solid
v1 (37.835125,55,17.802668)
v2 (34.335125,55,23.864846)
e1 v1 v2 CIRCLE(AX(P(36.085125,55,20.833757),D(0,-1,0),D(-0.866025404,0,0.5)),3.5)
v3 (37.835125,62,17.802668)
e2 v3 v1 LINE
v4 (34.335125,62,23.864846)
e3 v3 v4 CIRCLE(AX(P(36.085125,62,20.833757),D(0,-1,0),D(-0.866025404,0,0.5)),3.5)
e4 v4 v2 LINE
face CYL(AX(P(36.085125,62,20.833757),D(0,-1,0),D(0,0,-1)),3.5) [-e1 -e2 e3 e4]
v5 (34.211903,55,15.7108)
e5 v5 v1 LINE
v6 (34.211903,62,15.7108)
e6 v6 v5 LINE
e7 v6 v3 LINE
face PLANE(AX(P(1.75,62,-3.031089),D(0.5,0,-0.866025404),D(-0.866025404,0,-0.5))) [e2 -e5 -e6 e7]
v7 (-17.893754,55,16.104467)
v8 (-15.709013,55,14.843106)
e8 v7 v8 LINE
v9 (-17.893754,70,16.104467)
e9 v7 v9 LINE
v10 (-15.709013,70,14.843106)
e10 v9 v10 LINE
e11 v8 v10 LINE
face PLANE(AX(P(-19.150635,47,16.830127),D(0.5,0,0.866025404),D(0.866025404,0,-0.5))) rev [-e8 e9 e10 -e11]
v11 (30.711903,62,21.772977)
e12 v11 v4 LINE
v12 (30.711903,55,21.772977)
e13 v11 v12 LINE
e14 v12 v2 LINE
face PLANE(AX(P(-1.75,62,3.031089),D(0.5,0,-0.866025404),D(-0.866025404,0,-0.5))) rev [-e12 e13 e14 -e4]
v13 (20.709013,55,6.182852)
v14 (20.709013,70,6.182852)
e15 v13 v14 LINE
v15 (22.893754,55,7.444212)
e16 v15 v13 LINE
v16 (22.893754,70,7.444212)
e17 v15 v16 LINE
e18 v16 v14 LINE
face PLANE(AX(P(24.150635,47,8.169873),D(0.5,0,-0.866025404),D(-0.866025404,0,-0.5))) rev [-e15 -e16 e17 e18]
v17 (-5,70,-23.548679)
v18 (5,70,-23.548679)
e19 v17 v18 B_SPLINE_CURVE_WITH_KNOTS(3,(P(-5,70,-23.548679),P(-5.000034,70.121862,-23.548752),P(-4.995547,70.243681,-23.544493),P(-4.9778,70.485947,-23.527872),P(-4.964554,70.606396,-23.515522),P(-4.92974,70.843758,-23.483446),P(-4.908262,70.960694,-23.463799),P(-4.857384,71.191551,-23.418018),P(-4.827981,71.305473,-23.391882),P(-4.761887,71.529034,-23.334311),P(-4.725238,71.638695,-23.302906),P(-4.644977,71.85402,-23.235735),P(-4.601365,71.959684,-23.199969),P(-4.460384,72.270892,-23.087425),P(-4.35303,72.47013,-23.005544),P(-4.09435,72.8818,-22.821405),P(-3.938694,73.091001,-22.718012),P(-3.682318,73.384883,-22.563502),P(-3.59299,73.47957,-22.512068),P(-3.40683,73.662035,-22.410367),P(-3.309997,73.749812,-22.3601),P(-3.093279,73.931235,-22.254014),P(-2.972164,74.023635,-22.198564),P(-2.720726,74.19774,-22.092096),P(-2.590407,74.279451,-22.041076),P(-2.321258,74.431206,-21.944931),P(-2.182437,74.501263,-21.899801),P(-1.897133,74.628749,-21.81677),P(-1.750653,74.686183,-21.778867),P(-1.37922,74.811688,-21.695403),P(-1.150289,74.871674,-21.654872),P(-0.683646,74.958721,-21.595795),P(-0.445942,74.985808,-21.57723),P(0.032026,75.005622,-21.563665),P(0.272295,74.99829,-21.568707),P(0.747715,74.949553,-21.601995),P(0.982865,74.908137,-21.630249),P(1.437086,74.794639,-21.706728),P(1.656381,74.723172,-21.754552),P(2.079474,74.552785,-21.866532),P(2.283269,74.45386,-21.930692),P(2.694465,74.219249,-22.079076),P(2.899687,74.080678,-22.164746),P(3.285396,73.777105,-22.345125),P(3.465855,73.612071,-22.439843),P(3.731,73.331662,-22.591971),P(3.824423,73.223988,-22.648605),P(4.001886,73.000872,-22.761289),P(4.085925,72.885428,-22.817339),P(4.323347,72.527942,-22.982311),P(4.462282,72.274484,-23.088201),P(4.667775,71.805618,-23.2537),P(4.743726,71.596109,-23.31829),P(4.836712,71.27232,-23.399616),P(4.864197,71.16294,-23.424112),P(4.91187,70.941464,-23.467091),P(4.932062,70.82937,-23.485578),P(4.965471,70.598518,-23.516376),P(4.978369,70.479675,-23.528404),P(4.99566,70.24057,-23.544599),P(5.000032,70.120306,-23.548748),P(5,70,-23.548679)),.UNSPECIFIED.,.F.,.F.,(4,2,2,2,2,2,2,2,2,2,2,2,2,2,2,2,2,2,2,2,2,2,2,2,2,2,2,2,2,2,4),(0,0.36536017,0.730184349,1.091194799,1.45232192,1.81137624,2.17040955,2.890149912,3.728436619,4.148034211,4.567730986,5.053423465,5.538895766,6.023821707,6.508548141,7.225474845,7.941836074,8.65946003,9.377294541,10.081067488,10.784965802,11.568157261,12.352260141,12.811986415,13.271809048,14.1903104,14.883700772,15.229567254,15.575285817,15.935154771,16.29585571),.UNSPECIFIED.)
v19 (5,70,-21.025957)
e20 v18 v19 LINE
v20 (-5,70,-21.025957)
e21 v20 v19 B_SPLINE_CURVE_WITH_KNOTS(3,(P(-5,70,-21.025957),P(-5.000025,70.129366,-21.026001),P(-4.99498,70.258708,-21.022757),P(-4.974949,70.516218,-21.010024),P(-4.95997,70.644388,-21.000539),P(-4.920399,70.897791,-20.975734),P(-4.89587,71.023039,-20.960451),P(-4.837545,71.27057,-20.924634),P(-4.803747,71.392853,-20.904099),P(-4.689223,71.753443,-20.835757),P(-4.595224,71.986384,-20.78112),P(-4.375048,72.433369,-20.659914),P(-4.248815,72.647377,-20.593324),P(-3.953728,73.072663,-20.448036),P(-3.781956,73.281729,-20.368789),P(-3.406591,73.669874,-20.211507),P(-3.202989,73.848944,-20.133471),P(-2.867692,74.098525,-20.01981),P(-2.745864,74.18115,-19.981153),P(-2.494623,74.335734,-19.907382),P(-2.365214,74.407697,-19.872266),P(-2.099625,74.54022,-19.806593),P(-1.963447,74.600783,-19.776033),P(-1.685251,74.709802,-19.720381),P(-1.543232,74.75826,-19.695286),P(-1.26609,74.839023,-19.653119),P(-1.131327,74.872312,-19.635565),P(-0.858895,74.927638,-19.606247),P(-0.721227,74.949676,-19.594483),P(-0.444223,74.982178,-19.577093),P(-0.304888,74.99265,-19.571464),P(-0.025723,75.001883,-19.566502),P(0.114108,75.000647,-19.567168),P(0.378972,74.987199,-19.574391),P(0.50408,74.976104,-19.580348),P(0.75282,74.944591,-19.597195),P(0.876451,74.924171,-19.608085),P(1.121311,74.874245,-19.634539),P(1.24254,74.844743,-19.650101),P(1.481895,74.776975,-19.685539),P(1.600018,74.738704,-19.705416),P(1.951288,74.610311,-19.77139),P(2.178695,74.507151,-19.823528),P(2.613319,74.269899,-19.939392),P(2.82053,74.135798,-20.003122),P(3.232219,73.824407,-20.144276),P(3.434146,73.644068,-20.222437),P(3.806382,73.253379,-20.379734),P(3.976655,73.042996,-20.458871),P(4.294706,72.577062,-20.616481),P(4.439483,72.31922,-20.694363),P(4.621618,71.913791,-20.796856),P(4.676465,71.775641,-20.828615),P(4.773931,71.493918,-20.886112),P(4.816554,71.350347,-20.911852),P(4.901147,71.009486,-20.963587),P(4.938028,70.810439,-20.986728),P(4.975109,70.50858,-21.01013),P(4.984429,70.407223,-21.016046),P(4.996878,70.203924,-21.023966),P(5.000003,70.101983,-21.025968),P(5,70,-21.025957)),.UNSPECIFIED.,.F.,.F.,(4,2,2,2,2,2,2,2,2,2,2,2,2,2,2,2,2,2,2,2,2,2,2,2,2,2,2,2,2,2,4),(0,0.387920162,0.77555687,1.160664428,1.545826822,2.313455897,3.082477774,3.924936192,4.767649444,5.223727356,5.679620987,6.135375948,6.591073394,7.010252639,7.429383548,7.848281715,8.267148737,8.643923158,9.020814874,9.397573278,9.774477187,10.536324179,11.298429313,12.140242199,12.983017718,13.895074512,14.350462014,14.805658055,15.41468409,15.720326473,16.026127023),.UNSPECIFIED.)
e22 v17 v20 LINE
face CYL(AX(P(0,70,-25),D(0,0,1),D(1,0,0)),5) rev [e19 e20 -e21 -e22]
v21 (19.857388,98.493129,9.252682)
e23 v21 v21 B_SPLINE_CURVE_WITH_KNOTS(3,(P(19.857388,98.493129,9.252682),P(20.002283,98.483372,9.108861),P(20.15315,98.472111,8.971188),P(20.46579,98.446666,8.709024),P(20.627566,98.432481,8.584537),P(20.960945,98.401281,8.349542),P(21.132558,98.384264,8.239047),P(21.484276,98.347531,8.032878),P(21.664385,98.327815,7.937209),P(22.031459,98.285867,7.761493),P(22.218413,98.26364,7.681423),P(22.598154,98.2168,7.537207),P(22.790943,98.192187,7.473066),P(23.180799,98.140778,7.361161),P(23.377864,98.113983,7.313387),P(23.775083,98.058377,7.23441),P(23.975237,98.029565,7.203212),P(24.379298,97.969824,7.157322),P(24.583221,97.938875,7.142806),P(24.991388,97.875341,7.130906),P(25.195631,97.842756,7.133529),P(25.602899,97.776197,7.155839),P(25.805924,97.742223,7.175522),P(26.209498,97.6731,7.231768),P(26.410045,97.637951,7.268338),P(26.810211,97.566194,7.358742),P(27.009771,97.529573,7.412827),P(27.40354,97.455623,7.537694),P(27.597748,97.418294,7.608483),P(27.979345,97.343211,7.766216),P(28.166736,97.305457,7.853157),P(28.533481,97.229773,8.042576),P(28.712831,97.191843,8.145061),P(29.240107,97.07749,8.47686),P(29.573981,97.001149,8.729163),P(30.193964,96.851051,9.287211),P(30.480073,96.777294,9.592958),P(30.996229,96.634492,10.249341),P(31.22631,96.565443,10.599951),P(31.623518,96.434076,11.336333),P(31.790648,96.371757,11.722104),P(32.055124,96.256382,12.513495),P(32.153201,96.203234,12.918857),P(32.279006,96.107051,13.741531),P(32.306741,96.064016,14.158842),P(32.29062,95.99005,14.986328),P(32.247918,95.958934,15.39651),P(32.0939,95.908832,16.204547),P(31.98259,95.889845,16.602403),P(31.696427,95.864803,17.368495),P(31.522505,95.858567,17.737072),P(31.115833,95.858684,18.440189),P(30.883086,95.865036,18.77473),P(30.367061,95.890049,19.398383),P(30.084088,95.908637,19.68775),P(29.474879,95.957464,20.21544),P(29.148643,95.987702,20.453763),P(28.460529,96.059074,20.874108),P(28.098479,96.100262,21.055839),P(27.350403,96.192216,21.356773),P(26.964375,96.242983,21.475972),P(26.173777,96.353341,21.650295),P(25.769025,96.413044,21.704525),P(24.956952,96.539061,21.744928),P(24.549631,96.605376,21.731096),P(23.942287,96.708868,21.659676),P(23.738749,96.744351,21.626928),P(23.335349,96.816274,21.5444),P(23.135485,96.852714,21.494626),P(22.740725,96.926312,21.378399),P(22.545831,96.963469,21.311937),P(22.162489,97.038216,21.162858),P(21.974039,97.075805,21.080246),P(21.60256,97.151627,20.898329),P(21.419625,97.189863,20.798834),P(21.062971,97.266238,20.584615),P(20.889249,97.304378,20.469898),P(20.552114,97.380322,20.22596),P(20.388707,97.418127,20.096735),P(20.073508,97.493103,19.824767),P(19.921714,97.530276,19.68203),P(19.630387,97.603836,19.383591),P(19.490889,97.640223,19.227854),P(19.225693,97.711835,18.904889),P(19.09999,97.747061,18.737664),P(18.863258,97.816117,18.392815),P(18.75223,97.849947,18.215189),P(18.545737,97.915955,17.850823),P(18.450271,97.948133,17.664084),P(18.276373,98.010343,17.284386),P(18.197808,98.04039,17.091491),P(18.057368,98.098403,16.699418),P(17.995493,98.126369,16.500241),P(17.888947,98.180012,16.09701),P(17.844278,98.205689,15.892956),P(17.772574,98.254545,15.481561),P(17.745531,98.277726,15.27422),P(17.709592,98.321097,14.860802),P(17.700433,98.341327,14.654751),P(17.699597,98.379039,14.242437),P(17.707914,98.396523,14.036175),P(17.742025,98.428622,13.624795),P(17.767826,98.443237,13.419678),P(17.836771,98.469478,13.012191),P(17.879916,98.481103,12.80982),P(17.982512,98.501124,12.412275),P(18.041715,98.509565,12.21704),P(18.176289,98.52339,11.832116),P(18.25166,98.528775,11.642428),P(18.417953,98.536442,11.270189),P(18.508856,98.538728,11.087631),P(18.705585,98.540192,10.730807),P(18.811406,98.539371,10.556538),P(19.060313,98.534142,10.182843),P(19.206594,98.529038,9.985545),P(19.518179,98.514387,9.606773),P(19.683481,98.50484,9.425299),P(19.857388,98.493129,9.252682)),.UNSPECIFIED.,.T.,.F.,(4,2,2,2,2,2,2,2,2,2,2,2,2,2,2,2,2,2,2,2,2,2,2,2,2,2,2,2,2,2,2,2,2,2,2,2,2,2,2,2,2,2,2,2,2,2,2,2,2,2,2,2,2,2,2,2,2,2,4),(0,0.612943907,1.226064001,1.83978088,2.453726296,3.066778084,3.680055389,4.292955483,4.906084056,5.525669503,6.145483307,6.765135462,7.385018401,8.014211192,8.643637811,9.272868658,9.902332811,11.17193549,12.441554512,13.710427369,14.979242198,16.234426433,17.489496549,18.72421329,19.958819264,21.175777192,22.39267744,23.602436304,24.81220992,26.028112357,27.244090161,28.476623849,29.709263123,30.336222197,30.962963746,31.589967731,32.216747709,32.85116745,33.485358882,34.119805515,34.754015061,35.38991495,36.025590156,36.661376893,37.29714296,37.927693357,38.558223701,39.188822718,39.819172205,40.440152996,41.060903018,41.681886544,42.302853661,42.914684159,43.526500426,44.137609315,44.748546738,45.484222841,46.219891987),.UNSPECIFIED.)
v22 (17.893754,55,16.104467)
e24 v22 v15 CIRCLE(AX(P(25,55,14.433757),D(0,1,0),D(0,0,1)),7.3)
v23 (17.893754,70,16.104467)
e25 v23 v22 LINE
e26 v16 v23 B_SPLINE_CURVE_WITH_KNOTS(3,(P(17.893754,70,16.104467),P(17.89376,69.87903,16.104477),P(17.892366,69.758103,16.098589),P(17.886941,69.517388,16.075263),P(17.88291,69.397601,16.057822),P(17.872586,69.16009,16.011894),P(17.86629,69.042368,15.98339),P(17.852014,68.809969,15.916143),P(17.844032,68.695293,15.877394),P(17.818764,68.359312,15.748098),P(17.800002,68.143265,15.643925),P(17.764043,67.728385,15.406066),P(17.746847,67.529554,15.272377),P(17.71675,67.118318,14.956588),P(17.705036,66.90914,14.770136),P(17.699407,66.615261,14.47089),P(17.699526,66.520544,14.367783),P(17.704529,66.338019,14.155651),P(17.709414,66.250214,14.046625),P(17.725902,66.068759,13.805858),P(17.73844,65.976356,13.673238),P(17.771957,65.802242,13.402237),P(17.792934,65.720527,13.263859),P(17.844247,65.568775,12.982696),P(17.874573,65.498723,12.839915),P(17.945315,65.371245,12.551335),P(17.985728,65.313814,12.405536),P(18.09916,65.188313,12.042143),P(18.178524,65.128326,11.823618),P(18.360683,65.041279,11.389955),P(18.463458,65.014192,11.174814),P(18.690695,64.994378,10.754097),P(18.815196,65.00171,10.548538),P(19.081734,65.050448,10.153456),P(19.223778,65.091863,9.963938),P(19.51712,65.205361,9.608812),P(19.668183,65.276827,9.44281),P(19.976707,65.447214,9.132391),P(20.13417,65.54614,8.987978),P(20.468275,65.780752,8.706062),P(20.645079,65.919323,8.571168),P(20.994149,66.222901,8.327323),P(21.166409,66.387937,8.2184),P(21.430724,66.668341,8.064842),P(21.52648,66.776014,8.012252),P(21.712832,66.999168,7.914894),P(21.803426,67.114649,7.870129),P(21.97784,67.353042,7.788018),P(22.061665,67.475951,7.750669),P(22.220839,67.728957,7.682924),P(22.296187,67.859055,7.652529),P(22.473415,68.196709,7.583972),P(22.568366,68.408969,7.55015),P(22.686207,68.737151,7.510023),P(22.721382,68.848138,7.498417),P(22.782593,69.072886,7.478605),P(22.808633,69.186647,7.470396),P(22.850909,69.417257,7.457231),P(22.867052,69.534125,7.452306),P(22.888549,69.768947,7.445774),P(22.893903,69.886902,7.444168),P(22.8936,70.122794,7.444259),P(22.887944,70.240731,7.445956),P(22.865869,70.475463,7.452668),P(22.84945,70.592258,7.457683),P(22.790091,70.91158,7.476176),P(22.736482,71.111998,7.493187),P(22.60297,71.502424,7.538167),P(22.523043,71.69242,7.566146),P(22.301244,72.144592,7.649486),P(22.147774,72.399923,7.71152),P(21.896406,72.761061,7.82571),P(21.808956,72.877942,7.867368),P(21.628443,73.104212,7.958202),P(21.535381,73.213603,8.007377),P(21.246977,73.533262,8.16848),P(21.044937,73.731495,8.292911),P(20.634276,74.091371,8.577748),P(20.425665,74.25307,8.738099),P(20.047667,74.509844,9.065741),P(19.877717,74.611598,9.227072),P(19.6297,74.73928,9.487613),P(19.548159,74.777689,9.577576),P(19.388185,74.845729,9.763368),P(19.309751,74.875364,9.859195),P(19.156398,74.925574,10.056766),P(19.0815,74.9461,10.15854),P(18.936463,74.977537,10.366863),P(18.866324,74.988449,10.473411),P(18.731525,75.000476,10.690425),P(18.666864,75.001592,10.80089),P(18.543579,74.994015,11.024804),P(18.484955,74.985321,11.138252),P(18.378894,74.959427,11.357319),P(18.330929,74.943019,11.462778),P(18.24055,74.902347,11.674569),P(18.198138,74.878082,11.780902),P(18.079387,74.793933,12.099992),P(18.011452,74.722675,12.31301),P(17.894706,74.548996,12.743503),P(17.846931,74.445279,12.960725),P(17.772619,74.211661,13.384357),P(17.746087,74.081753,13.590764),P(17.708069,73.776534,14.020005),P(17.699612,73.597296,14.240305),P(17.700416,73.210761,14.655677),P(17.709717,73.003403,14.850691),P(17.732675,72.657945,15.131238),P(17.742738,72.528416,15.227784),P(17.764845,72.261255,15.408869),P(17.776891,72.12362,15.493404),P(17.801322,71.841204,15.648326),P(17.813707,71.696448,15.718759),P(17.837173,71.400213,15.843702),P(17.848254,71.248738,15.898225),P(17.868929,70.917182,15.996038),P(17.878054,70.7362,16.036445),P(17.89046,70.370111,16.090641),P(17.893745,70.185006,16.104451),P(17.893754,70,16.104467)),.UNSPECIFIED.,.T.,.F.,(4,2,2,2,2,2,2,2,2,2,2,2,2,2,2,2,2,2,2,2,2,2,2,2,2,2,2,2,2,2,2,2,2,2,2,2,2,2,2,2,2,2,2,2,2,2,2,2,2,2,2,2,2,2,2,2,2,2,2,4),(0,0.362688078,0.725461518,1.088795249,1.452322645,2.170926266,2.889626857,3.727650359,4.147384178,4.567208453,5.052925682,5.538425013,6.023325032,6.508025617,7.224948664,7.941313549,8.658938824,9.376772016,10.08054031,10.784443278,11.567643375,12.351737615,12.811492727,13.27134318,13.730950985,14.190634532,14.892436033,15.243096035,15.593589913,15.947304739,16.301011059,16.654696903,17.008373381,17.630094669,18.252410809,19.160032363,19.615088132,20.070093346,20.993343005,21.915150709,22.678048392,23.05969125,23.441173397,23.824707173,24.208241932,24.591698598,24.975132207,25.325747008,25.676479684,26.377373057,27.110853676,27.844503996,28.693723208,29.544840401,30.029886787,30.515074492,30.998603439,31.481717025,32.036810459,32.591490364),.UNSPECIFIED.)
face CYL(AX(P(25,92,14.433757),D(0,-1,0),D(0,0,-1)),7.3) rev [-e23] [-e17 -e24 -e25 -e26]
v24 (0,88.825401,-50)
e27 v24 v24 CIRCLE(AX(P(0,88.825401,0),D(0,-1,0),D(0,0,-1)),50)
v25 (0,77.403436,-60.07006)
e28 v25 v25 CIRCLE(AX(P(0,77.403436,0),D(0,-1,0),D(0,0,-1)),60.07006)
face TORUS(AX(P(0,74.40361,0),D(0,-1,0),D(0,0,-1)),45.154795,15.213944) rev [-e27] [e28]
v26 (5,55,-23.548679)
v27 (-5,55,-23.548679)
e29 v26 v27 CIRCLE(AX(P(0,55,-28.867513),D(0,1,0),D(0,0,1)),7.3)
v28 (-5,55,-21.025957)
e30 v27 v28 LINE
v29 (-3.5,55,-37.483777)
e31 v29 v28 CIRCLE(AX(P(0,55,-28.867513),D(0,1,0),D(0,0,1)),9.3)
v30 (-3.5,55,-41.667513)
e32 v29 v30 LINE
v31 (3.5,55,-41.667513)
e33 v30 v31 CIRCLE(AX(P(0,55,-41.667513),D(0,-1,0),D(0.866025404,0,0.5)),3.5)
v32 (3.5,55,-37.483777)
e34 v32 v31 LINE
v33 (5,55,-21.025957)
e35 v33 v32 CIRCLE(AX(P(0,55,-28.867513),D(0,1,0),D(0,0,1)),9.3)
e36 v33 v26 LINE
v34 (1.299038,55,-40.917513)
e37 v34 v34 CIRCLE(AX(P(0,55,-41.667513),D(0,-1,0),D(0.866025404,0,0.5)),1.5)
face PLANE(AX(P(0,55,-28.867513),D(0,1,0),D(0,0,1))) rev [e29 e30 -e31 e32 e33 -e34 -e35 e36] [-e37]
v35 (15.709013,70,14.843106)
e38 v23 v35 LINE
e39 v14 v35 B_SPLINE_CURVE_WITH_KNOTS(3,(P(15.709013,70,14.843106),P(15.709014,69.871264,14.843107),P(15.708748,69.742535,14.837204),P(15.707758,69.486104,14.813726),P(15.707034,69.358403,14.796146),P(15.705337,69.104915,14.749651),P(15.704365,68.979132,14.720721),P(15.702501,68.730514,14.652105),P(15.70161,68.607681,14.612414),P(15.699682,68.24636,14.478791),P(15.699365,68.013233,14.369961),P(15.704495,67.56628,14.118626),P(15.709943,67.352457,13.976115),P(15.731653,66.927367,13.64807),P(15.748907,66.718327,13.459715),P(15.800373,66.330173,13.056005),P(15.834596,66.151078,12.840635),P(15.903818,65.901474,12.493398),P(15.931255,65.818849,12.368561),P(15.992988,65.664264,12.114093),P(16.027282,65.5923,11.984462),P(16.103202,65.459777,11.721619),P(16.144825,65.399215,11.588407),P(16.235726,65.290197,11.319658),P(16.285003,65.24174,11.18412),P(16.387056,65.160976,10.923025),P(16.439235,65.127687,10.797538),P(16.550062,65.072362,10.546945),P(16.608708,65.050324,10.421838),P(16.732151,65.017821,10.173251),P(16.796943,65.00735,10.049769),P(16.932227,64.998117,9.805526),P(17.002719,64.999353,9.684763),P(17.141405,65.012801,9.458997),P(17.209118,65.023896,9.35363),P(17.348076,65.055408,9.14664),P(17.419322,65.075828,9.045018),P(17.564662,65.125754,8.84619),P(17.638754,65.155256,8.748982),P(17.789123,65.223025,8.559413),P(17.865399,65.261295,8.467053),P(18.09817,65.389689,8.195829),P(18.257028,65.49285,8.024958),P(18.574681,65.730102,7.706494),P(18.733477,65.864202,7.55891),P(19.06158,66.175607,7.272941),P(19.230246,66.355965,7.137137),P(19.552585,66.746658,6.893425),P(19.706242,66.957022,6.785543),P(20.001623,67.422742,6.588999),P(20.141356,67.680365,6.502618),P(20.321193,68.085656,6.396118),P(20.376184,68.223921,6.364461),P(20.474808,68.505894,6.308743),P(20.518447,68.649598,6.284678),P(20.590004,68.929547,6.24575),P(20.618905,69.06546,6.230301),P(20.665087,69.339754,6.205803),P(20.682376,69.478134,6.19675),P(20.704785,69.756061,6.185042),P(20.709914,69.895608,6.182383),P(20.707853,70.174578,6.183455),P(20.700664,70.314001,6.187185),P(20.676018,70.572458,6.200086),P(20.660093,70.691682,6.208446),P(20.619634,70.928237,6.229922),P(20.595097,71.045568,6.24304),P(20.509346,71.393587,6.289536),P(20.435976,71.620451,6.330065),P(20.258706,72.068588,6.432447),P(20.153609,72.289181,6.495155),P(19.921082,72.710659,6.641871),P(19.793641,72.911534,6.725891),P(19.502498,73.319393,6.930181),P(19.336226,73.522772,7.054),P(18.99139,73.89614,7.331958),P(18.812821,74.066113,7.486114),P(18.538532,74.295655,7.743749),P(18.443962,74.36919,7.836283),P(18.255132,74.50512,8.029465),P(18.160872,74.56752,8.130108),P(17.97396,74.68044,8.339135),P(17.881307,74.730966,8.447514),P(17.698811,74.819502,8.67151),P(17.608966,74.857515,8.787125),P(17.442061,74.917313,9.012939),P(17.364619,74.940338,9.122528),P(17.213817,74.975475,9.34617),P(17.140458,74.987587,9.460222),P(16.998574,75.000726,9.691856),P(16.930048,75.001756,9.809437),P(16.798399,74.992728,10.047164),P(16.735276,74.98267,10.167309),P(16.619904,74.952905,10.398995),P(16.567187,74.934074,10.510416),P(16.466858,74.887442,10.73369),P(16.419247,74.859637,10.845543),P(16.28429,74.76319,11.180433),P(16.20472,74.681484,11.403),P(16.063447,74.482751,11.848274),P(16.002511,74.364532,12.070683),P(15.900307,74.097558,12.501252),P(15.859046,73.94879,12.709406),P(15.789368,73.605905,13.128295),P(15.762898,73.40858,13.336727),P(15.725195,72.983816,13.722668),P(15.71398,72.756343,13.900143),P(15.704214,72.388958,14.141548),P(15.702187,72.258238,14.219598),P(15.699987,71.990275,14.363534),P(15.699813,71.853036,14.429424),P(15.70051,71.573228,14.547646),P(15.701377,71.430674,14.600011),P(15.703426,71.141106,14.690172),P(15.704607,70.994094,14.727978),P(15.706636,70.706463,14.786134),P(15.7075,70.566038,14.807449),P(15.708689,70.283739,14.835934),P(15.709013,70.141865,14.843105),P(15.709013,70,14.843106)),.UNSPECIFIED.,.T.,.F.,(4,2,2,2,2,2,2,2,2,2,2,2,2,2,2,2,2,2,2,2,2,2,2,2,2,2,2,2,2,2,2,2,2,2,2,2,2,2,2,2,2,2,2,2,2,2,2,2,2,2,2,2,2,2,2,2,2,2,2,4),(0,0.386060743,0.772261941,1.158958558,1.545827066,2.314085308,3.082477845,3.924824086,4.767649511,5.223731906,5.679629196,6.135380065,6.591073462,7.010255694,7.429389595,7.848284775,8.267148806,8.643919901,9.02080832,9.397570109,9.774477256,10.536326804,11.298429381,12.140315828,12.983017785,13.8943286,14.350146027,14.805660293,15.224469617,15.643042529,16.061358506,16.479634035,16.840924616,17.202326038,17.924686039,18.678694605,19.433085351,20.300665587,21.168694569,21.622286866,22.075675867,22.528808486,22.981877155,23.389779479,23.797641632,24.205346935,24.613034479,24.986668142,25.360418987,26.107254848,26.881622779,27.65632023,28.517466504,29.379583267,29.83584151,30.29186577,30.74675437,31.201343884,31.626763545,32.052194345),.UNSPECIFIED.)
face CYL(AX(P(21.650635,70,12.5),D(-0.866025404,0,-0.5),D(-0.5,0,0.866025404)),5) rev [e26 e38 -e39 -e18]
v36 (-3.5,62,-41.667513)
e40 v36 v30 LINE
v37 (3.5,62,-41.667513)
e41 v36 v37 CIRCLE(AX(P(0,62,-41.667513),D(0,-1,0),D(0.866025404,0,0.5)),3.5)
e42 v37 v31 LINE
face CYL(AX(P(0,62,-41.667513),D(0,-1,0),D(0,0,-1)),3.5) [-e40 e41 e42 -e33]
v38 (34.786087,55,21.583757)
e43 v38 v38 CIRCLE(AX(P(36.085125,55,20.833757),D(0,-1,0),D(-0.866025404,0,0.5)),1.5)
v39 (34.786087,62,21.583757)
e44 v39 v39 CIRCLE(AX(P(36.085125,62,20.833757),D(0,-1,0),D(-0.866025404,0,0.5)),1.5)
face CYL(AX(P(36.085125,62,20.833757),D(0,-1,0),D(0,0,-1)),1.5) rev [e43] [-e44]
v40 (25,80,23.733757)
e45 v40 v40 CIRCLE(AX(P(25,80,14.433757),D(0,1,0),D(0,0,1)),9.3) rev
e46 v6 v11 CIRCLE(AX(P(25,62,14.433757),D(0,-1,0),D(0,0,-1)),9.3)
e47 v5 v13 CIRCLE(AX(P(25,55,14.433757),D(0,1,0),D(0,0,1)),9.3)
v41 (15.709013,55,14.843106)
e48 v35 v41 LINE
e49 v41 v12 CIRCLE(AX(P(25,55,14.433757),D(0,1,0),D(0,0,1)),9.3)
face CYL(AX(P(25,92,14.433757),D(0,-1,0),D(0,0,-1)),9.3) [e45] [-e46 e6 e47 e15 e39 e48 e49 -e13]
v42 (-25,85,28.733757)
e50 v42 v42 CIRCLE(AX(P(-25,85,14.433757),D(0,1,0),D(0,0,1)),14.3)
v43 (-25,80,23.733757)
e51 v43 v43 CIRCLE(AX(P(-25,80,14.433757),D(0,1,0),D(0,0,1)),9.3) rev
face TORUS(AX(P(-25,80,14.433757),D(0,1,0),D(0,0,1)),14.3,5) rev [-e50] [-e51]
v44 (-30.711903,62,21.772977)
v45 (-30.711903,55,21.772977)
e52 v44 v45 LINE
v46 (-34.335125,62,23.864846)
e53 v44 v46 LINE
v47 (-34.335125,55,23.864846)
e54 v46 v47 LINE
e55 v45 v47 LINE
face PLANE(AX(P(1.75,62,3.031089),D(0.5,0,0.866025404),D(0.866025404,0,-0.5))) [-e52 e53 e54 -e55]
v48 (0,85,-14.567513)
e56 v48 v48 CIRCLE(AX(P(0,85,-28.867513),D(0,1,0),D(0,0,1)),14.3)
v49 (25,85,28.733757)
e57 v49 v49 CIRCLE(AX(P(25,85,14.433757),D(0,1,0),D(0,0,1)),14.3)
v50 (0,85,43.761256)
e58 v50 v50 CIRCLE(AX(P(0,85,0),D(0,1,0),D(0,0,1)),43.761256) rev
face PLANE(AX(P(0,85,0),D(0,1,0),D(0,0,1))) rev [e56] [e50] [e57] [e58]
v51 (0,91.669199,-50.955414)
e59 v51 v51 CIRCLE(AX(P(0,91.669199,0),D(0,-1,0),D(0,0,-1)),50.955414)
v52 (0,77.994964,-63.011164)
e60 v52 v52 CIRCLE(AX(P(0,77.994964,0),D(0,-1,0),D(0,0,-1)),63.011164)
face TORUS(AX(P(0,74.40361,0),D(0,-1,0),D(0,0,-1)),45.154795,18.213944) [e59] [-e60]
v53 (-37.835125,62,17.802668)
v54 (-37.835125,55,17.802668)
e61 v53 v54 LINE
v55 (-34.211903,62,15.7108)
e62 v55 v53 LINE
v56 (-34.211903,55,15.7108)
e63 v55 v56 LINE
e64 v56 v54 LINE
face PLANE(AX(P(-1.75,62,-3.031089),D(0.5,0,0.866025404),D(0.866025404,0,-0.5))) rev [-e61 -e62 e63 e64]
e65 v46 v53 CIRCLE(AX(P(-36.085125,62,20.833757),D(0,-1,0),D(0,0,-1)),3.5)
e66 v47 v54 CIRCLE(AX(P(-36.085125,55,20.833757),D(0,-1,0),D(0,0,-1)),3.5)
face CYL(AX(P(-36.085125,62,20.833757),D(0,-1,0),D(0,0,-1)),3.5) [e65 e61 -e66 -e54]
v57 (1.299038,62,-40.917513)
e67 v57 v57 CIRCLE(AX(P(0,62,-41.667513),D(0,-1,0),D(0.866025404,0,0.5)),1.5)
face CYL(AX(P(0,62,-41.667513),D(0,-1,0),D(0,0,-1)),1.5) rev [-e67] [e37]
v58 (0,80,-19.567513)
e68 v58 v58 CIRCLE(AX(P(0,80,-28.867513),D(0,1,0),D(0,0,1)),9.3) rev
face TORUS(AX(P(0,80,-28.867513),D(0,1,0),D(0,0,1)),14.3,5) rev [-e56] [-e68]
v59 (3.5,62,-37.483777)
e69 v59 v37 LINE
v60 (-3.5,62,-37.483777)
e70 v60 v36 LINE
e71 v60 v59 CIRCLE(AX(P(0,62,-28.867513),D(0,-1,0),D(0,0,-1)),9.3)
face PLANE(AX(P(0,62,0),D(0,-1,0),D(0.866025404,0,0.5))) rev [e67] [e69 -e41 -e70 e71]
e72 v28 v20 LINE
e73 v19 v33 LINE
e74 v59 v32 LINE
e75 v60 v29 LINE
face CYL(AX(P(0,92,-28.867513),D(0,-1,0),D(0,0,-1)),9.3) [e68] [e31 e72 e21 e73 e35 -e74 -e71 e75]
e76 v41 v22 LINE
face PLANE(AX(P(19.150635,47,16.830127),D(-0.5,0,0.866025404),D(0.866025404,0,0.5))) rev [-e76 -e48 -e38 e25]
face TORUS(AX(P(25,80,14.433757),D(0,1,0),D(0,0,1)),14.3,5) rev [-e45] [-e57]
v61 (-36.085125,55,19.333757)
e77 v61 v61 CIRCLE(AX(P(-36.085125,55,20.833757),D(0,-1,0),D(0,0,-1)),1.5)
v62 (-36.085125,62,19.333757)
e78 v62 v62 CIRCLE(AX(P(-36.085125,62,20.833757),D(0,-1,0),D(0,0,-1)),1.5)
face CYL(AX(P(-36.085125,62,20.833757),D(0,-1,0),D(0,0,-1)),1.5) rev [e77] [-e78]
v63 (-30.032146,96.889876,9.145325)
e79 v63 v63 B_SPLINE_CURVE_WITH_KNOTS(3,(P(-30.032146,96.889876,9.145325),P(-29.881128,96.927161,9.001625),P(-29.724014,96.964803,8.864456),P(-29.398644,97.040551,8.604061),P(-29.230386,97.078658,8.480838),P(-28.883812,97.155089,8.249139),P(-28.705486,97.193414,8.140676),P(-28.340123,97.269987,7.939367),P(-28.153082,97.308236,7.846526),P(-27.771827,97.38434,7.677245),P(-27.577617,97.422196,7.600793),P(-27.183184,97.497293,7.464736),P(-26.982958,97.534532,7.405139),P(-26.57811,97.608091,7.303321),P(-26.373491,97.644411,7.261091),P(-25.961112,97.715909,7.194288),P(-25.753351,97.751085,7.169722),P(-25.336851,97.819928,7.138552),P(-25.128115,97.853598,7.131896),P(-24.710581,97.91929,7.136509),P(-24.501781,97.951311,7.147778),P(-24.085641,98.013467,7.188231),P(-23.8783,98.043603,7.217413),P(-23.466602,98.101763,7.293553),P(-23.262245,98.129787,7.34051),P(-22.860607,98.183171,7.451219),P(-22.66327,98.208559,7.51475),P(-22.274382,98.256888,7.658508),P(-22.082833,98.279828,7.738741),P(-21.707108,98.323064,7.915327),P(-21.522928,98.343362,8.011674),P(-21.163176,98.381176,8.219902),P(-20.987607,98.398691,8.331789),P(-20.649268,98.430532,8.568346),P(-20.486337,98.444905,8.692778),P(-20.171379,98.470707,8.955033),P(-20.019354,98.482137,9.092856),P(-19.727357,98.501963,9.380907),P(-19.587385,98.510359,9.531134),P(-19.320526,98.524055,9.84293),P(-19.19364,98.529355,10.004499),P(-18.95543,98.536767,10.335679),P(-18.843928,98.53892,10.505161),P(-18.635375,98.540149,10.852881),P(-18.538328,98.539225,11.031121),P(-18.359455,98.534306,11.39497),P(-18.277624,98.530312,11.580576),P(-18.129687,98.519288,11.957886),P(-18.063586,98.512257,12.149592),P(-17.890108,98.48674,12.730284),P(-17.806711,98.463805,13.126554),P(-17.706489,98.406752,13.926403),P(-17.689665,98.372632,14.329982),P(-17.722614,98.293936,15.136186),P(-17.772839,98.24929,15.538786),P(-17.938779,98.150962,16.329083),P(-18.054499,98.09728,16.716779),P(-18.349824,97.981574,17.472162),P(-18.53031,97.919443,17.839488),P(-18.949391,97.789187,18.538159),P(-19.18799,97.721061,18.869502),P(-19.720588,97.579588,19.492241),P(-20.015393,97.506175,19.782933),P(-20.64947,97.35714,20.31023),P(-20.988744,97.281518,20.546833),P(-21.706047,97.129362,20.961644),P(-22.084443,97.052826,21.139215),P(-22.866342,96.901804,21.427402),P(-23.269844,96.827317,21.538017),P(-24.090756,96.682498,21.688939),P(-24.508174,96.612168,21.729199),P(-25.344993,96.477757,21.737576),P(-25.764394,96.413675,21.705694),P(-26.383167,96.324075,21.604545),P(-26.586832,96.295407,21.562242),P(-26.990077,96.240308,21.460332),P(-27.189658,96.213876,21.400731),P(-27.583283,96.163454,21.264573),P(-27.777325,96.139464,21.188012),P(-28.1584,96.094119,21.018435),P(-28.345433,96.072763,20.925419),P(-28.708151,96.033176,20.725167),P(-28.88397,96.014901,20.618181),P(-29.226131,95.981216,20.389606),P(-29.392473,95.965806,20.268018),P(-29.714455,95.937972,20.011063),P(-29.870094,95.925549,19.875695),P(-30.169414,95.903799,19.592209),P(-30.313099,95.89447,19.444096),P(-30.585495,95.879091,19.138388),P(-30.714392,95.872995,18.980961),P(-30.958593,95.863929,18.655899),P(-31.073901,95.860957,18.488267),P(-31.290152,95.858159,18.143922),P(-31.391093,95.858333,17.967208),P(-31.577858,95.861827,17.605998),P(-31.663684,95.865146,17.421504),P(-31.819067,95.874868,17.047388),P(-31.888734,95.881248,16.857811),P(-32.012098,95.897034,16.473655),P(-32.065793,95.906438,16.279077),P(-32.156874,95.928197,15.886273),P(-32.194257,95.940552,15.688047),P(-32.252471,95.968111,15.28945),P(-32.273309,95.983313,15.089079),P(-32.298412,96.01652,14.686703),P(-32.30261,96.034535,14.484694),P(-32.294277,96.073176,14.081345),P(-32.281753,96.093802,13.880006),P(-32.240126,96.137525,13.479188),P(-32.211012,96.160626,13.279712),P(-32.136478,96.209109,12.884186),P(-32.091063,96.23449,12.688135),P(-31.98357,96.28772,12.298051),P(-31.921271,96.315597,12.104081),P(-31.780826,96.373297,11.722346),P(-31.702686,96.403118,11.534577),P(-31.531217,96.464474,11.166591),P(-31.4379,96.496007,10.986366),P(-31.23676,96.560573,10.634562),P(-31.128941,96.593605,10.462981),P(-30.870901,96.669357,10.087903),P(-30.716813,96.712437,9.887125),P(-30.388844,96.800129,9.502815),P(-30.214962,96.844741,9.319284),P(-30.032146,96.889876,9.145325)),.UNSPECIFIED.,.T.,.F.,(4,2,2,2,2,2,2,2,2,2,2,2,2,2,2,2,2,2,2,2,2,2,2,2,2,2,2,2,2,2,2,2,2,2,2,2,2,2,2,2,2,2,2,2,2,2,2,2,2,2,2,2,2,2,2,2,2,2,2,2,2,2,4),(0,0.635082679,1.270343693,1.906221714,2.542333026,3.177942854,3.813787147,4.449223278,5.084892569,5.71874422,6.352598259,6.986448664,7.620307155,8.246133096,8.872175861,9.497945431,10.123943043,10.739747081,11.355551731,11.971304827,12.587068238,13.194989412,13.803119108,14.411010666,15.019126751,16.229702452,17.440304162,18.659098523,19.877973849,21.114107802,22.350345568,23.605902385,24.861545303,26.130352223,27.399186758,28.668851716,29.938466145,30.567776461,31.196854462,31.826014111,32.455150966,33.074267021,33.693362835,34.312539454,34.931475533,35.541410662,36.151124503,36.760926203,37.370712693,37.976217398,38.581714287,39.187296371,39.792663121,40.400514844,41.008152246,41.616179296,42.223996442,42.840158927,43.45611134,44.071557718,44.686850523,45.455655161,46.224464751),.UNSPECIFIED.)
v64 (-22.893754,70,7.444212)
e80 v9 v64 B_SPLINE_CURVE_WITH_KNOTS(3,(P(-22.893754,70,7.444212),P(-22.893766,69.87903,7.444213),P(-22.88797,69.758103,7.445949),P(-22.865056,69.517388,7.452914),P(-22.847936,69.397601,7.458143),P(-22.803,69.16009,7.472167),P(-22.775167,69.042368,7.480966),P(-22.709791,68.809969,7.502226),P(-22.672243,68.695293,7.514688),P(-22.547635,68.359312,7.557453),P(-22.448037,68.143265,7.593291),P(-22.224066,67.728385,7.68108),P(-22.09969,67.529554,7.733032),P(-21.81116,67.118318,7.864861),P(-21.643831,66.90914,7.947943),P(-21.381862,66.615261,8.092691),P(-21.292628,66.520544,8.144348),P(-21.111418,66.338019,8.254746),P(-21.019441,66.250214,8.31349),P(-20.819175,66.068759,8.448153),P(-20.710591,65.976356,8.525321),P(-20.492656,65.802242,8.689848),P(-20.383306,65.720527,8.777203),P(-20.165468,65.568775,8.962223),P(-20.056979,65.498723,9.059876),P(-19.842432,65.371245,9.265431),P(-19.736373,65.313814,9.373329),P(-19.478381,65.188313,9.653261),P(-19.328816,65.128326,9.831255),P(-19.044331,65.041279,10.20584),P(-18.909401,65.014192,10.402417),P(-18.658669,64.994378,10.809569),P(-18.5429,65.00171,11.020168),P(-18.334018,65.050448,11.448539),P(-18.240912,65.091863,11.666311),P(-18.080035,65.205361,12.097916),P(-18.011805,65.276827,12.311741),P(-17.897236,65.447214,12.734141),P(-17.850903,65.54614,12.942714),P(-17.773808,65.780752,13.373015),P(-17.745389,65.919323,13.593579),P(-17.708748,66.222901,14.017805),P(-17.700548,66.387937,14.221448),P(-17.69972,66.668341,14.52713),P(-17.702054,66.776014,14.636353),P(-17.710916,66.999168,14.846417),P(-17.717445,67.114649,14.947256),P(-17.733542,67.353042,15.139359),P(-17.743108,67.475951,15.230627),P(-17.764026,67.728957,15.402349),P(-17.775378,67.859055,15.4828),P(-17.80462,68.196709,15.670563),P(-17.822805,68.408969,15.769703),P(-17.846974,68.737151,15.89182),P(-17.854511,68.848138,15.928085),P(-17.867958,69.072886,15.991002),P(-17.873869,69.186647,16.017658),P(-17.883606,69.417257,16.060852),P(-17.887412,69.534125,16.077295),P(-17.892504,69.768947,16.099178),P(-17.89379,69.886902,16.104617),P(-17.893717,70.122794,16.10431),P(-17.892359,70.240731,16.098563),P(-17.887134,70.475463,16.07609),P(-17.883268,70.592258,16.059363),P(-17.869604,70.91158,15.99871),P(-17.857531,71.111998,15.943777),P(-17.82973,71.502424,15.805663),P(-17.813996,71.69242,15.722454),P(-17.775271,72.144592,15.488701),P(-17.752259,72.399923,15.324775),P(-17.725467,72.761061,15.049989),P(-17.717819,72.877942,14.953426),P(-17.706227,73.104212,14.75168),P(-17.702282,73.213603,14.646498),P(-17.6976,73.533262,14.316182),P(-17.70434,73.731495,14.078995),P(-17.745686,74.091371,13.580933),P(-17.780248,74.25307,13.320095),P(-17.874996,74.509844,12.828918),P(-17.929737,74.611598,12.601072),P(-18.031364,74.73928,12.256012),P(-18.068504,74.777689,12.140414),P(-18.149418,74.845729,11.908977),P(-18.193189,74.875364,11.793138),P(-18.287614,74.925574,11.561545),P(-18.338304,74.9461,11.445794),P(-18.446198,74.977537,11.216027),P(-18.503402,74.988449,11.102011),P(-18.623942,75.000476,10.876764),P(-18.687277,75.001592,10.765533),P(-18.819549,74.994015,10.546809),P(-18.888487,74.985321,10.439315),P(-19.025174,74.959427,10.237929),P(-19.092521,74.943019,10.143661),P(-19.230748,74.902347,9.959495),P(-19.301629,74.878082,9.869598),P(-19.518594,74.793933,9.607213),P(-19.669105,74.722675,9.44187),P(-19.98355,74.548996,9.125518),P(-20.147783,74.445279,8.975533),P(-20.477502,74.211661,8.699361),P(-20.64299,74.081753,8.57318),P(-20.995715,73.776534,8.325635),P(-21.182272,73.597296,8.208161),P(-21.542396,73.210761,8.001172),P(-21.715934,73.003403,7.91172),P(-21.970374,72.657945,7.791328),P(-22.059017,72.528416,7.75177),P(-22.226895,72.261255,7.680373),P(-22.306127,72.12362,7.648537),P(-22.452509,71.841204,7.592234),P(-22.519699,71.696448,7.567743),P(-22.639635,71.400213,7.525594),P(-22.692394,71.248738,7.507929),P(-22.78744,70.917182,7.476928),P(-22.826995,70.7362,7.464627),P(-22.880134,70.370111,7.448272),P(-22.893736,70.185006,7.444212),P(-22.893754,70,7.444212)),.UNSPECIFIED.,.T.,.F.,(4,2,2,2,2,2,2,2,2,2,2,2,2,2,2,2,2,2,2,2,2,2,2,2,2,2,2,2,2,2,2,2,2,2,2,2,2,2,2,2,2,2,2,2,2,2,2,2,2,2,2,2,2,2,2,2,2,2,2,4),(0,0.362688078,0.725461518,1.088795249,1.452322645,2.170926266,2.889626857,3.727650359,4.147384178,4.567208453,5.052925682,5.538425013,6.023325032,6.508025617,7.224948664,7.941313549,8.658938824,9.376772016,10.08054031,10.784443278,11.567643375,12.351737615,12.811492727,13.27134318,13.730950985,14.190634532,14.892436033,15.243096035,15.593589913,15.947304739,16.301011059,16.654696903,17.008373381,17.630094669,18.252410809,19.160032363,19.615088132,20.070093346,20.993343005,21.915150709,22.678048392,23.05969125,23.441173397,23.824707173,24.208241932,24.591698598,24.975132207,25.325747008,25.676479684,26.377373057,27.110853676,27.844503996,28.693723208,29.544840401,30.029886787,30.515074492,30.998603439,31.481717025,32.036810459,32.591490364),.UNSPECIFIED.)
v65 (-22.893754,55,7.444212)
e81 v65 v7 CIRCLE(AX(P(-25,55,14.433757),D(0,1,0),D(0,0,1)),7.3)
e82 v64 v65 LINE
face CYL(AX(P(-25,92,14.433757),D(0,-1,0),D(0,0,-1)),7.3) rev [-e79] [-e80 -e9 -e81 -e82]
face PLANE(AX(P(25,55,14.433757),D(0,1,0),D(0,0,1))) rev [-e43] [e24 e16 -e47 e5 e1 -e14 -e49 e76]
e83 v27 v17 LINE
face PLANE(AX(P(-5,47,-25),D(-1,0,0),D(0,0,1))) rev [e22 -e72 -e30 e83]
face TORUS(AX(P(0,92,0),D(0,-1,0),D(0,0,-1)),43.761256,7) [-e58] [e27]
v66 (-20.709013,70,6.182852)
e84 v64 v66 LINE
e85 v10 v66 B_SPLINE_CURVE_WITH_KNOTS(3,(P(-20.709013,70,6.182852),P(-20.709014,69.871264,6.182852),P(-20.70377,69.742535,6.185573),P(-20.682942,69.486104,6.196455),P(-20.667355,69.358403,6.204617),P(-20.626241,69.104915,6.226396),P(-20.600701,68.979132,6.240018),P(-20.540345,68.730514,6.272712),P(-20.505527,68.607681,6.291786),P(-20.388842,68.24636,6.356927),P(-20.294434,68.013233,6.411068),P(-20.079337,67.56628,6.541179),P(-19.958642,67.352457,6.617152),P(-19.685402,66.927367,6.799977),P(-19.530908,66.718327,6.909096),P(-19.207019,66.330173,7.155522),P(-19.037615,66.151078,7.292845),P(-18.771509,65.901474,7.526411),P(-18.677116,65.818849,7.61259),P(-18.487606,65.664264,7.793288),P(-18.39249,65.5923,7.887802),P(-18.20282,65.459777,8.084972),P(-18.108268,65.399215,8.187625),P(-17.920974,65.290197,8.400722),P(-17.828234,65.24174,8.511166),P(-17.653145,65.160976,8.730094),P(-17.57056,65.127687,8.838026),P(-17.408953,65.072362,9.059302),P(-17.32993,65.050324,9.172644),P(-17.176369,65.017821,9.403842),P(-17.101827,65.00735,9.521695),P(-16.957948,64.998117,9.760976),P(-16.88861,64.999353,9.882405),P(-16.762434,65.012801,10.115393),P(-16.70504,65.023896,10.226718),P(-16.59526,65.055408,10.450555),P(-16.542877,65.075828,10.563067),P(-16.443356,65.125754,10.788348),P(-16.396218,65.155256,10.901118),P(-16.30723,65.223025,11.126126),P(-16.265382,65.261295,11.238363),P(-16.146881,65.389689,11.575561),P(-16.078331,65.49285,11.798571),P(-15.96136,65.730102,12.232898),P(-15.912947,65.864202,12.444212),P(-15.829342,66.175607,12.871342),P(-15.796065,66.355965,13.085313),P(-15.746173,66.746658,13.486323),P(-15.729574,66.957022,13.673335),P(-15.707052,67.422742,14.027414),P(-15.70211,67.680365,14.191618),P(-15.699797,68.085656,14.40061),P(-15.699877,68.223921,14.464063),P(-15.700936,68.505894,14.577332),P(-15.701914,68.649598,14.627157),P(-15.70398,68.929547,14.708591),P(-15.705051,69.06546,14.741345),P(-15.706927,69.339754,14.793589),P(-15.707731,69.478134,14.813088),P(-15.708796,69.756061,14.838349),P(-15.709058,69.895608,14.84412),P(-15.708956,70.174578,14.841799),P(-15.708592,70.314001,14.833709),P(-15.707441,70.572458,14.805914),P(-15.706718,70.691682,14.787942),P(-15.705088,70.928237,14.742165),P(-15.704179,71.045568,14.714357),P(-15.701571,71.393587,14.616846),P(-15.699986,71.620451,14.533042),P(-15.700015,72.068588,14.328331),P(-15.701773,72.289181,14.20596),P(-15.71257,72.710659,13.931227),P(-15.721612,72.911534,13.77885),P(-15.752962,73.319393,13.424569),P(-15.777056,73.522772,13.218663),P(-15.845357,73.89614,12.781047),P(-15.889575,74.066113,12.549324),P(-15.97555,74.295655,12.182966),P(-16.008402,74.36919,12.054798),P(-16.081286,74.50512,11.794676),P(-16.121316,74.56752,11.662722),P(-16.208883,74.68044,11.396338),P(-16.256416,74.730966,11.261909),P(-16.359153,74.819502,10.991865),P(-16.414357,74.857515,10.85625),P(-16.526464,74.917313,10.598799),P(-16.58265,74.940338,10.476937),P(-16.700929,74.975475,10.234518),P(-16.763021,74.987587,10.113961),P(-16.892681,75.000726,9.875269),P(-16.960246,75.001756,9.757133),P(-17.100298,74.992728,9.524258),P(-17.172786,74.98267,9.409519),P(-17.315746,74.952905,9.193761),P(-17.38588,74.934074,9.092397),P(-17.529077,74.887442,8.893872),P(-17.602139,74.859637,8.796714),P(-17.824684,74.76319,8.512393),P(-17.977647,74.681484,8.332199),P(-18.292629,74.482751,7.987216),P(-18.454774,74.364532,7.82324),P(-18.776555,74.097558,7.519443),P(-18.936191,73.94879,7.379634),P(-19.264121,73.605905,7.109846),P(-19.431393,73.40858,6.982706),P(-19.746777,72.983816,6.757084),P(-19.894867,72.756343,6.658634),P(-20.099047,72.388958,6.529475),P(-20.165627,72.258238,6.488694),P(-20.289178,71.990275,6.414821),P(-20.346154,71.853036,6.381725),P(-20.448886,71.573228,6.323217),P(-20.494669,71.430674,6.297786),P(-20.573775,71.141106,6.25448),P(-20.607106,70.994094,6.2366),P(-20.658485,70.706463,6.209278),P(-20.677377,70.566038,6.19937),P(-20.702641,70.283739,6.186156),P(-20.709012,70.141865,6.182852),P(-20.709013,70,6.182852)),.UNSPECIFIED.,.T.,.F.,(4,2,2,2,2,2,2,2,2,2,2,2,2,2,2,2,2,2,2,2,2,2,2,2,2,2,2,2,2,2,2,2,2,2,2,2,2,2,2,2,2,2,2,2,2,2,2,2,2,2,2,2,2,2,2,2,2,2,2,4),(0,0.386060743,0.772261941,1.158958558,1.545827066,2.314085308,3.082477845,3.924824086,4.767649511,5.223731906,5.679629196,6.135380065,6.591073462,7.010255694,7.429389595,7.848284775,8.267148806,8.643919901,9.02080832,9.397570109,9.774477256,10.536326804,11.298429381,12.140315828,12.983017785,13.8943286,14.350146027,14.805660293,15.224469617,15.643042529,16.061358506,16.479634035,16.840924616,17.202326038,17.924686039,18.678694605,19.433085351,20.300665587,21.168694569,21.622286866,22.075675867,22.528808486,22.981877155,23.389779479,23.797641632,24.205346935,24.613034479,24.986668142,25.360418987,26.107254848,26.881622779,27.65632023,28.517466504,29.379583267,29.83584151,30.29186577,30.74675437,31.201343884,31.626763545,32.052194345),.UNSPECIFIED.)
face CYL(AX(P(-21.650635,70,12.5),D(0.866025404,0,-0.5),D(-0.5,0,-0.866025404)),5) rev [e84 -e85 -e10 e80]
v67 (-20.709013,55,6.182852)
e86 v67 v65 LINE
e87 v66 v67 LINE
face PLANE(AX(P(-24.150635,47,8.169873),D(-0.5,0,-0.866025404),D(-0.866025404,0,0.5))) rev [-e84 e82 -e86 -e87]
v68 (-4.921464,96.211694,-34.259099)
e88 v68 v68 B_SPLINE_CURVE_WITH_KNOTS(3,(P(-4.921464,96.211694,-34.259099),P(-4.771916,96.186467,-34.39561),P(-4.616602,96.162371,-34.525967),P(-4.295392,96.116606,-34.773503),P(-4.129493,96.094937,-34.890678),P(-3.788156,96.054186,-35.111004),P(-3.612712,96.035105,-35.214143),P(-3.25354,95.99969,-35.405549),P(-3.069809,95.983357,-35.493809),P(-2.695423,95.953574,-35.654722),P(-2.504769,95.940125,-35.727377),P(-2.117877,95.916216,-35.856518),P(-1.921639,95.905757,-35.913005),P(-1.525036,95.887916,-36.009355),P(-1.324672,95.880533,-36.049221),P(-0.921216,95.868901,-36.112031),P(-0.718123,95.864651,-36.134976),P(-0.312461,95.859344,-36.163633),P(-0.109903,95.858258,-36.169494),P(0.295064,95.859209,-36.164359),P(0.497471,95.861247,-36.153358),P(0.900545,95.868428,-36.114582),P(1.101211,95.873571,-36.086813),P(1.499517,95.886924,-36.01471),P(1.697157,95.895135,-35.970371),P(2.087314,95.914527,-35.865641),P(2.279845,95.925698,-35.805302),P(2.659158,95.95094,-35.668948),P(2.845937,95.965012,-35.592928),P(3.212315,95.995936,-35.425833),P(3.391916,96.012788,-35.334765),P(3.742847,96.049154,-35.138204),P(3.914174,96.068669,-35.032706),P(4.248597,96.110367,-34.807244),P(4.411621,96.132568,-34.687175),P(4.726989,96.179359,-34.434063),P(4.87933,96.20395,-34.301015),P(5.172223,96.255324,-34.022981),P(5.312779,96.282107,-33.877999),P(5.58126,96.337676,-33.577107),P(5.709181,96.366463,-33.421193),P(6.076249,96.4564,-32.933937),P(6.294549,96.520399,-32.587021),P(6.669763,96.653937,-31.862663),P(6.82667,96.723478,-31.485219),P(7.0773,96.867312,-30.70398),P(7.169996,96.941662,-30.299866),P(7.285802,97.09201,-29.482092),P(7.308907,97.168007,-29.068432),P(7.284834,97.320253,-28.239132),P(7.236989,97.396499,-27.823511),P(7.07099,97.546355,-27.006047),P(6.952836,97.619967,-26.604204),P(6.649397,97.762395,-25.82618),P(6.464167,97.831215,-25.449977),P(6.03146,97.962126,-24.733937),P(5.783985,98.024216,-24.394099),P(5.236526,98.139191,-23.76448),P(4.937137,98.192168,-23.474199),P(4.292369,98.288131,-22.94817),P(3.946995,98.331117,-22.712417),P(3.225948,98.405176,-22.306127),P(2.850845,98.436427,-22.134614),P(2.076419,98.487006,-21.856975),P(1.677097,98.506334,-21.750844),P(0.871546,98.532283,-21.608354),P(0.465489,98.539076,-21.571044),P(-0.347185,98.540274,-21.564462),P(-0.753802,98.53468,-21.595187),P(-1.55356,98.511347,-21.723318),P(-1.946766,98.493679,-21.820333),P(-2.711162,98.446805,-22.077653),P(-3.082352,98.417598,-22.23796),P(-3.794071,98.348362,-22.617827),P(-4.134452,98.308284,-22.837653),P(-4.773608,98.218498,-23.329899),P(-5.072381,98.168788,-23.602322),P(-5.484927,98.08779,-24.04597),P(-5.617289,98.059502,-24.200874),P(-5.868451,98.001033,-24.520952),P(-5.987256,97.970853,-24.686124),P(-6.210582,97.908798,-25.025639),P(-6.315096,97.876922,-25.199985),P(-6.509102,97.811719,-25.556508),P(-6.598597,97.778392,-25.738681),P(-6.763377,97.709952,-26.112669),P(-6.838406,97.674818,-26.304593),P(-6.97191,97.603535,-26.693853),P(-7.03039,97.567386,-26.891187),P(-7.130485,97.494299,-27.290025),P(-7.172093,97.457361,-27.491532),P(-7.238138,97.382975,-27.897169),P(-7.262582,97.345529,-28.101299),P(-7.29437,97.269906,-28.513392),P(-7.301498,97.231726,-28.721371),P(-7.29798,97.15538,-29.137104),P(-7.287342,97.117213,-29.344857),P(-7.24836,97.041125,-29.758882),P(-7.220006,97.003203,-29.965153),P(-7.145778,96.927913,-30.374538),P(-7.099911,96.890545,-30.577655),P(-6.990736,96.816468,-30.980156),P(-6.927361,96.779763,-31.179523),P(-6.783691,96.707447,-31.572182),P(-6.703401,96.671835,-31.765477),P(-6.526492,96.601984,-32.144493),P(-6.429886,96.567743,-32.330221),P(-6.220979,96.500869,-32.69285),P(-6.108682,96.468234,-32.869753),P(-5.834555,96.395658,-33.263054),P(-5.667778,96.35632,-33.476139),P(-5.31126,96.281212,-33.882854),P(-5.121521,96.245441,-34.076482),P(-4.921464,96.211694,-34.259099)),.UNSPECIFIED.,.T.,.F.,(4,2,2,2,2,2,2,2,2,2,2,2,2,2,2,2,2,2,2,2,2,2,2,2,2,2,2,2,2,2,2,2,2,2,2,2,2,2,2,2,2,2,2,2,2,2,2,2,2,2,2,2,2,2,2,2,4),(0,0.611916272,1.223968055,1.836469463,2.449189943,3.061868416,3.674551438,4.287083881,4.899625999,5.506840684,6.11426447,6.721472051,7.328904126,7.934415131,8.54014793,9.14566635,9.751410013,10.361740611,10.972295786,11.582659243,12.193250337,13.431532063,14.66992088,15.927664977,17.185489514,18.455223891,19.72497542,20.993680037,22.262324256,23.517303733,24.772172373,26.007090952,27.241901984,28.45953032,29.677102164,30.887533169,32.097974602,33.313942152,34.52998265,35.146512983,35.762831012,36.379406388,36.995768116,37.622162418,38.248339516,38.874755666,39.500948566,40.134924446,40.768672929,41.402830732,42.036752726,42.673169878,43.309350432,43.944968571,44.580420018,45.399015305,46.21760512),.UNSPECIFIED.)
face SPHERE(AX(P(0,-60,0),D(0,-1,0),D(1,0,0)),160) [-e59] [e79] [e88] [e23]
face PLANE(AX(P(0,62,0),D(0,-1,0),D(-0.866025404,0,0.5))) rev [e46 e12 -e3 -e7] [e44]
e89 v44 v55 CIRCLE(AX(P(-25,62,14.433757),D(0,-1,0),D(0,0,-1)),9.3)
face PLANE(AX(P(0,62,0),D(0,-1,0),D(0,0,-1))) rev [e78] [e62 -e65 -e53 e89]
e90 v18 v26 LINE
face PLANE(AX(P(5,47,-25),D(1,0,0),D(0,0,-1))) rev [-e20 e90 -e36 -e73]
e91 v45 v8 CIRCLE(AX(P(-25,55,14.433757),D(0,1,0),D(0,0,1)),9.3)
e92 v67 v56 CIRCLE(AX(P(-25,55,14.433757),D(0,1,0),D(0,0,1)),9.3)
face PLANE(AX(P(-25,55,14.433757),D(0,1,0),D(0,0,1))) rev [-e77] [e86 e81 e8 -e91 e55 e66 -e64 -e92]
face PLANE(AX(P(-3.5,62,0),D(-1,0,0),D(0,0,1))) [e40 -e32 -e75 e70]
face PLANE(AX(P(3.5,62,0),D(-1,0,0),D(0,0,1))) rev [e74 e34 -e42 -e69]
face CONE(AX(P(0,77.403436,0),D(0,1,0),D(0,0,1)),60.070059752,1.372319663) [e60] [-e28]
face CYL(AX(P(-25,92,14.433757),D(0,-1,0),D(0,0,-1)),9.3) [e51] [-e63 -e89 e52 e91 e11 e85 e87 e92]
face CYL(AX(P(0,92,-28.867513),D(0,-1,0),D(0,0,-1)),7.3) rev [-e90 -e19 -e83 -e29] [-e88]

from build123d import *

# Parameters (mm, degrees)
SALIENTE_EXTRUIR2_REACH = 220.943
SALIENTE_EXTRUIR2_START = 85
CROQUIS5_R              = 50
SALIENTE_EXTRUIR1_START = 55
CROQUIS1_R              = 9.3
CROQUIS1_R_2            = 7.3
SALIENTE_EXTRUIR1_DEPTH = 37
CROQUIS3_R              = 7.3
CORTAR_EXTRUIR1_DEPTH   = 134.943322251
CROQUIS12_R             = 1.5
SALIENTE_EXTRUIR6_DEPTH = 7
CORTAR_EXTRUIR4_DEPTH   = 25
MATRIZC1_COUNT          = 3
REDONDEO2_R             = 5
REDONDEO3_R             = 7


with BuildPart() as part:
    # Croquis2 → Revolución1 (revolve)
    with BuildSketch(Plane.XY, mode=Mode.PRIVATE) as revoluci_n1_sk:
        with BuildLine():
            Line((0, 100), (0, 97))
            ThreePointArc((0, 97), (25.331916962, 94.942873289), (50, 88.825401058))
            ThreePointArc((50, 88.825401058), (56.566822084, 84.464907665), (60.070059752, 77.403436094))
            Line((60.070059752, 77.403436094), (63.011163994, 77.994964485))
            ThreePointArc((63.011163994, 77.994964485), (58.817131536, 86.448870207), (50.955414013, 91.66919853))
            ThreePointArc((50.955414013, 91.66919853), (25.815966331, 97.903565135), (0, 100))
        make_face()
    revolve(revoluci_n1_sk.sketch.rotate(Axis((0, 0, 0), (0, 1, 0)), 90), axis=Axis((0, 0, 0), (0, 1, 0)))

    # Croquis5 → Saliente-Extruir2 (add, up to next)
    with BuildSketch(Plane(origin=(0, 0, 0), x_dir=(1, 0, 0), z_dir=(0, 1, 0)).offset(SALIENTE_EXTRUIR2_START), mode=Mode.PRIVATE) as saliente_extruir2_sk1:
        with Locations(Location((0, 0, 0), (0, 0, 90))):
            Circle(CROQUIS5_R)
    saliente_extruir2_tool1 = extrude(saliente_extruir2_sk1.sketch, amount=SALIENTE_EXTRUIR2_REACH, mode=Mode.PRIVATE) - part.part
    add(saliente_extruir2_tool1.solids().sort_by_distance((0, 85, 0))[0])

    # Croquis1 → Saliente-Extruir1 (add)
    # profile 1 of 3: a face of its own
    with BuildSketch(Plane(origin=(0, 0, 0), x_dir=(1, 0, 0), z_dir=(0, 1, 0)).offset(SALIENTE_EXTRUIR1_START)):
        with Locations(Location((0, 28.867513459, 0), (0, 0, 270))):
            Circle(CROQUIS1_R)
        with Locations(Location((0, 28.867513459, 0), (0, 0, 270))):
            Circle(CROQUIS1_R_2, mode=Mode.SUBTRACT)
    # profile 2 of 3: a face of its own
    with BuildSketch(Plane(origin=(0, 0, 0), x_dir=(1, 0, 0), z_dir=(0, 1, 0)).offset(SALIENTE_EXTRUIR1_START)):
        with Locations(Location((25, -14.43375673, 0), (0, 0, 270))):
            Circle(CROQUIS1_R)
        with Locations(Location((25, -14.43375673, 0), (0, 0, 270))):
            Circle(CROQUIS1_R_2, mode=Mode.SUBTRACT)
    # profile 3 of 3: a face of its own
    with BuildSketch(Plane(origin=(0, 0, 0), x_dir=(1, 0, 0), z_dir=(0, 1, 0)).offset(SALIENTE_EXTRUIR1_START)):
        with Locations(Location((-25, -14.43375673, 0), (0, 0, 270))):
            Circle(CROQUIS1_R)
        with Locations(Location((-25, -14.43375673, 0), (0, 0, 270))):
            Circle(CROQUIS1_R_2, mode=Mode.SUBTRACT)
    extrude(amount=SALIENTE_EXTRUIR1_DEPTH)

    # Croquis3 → Cortar-Extruir1 (cut, through all)
    with BuildSketch(Plane(origin=(0, 0, 0), x_dir=(1, 0, 0), z_dir=(0, 1, 0))):
        with Locations(Location((25, -14.43375673, 0), (0, 0, 134.786535958))):
            Circle(CROQUIS3_R)
        with Locations(Location((0, 28.867513459, 0), (0, 0, 132.389969071))):
            Circle(CROQUIS3_R)
        with Locations(Location((-25, -14.43375673, 0), (0, 0, 133.577494884))):
            Circle(CROQUIS3_R)
    extrude(amount=CORTAR_EXTRUIR1_DEPTH, mode=Mode.SUBTRACT)

    # Croquis12 → Saliente-Extruir6 (add)
    with BuildSketch(Plane.XZ.offset(-55)):
        with BuildLine():
            Line((-37.835125168, 17.802667816), (-34.211903242, 15.710799662))
            ThreePointArc((-34.211903242, 15.710799662), (-33.054036255, 19.08375673), (-30.711903242, 21.772977489))
            Line((-30.711903242, 21.772977489), (-34.335125168, 23.864845643))
            ThreePointArc((-34.335125168, 23.864845643), (-39.116214082, 22.58375673), (-37.835125168, 17.802667816))
        make_face()
        with Locations(Location((-36.085125168, 20.83375673, 0), (0, 0, 270))):
            Circle(CROQUIS12_R, mode=Mode.SUBTRACT)
    saliente_extruir6 = extrude(amount=-SALIENTE_EXTRUIR6_DEPTH)

    # Croquis10 → Cortar-Extruir4 (cut)
    with BuildSketch(Plane.XY):
        with BuildLine():
            Line((-5, 47), (-5, 70))
            ThreePointArc((-5, 70), (0, 75), (5, 70))
            Line((5, 70), (5, 47))
            ThreePointArc((5, 47), (0, 42), (-5, 47))
        make_face()
    cortar_extruir4 = extrude(amount=-CORTAR_EXTRUIR4_DEPTH, mode=Mode.SUBTRACT)

    # MatrizC1: Saliente-Extruir6, Cortar-Extruir4 ×3 about axis
    matrizc1_axis = Axis((0, 0, 0), (0, 1, 0))
    add([saliente_extruir6.rotate(matrizc1_axis, i * 360 / MATRIZC1_COUNT) for i in range(1, MATRIZC1_COUNT)])
    add([cortar_extruir4.rotate(matrizc1_axis, i * 360 / MATRIZC1_COUNT) for i in range(1, MATRIZC1_COUNT)], mode=Mode.SUBTRACT)

    # Redondeo2
    redondeo2_edges = [part.edges().sort_by_distance(p)[0] for p in [
        (0, 85, -38.167513459),
        (25, 85, 5.13375673),
        (-25, 85, 5.13375673),
    ]]
    fillet(redondeo2_edges, radius=REDONDEO2_R)

    # Redondeo3
    # the kernel refuses this fillet: 7 mm, written as the material it takes off along each edge
    with BuildSketch(Plane(origin=(0, 85, 0), x_dir=(0, 0, -1), z_dir=(1, 0, 0))) as redondeo3_piece_1:
        with BuildLine():
            CenterArc((43.761256412, 7), REDONDEO3_R, 270, 63.030628279)
            Line((50, 3.825401058), (50.124774872, 3.761909079))
            ThreePointArc((50.124774872, 3.761909079), (50.14, 1.912700529), (50.14, 0))
            Line((50.14, 0), (50, -0.14))
            Line((50, -0.14), (43.761256412, -0.14))
            Line((43.761256412, -0.14), (43.761256412, 0))
        make_face()
    revolve(axis=Axis((0, 85, 0), (0, 1, 0)), mode=Mode.SUBTRACT)


solid = part.part
